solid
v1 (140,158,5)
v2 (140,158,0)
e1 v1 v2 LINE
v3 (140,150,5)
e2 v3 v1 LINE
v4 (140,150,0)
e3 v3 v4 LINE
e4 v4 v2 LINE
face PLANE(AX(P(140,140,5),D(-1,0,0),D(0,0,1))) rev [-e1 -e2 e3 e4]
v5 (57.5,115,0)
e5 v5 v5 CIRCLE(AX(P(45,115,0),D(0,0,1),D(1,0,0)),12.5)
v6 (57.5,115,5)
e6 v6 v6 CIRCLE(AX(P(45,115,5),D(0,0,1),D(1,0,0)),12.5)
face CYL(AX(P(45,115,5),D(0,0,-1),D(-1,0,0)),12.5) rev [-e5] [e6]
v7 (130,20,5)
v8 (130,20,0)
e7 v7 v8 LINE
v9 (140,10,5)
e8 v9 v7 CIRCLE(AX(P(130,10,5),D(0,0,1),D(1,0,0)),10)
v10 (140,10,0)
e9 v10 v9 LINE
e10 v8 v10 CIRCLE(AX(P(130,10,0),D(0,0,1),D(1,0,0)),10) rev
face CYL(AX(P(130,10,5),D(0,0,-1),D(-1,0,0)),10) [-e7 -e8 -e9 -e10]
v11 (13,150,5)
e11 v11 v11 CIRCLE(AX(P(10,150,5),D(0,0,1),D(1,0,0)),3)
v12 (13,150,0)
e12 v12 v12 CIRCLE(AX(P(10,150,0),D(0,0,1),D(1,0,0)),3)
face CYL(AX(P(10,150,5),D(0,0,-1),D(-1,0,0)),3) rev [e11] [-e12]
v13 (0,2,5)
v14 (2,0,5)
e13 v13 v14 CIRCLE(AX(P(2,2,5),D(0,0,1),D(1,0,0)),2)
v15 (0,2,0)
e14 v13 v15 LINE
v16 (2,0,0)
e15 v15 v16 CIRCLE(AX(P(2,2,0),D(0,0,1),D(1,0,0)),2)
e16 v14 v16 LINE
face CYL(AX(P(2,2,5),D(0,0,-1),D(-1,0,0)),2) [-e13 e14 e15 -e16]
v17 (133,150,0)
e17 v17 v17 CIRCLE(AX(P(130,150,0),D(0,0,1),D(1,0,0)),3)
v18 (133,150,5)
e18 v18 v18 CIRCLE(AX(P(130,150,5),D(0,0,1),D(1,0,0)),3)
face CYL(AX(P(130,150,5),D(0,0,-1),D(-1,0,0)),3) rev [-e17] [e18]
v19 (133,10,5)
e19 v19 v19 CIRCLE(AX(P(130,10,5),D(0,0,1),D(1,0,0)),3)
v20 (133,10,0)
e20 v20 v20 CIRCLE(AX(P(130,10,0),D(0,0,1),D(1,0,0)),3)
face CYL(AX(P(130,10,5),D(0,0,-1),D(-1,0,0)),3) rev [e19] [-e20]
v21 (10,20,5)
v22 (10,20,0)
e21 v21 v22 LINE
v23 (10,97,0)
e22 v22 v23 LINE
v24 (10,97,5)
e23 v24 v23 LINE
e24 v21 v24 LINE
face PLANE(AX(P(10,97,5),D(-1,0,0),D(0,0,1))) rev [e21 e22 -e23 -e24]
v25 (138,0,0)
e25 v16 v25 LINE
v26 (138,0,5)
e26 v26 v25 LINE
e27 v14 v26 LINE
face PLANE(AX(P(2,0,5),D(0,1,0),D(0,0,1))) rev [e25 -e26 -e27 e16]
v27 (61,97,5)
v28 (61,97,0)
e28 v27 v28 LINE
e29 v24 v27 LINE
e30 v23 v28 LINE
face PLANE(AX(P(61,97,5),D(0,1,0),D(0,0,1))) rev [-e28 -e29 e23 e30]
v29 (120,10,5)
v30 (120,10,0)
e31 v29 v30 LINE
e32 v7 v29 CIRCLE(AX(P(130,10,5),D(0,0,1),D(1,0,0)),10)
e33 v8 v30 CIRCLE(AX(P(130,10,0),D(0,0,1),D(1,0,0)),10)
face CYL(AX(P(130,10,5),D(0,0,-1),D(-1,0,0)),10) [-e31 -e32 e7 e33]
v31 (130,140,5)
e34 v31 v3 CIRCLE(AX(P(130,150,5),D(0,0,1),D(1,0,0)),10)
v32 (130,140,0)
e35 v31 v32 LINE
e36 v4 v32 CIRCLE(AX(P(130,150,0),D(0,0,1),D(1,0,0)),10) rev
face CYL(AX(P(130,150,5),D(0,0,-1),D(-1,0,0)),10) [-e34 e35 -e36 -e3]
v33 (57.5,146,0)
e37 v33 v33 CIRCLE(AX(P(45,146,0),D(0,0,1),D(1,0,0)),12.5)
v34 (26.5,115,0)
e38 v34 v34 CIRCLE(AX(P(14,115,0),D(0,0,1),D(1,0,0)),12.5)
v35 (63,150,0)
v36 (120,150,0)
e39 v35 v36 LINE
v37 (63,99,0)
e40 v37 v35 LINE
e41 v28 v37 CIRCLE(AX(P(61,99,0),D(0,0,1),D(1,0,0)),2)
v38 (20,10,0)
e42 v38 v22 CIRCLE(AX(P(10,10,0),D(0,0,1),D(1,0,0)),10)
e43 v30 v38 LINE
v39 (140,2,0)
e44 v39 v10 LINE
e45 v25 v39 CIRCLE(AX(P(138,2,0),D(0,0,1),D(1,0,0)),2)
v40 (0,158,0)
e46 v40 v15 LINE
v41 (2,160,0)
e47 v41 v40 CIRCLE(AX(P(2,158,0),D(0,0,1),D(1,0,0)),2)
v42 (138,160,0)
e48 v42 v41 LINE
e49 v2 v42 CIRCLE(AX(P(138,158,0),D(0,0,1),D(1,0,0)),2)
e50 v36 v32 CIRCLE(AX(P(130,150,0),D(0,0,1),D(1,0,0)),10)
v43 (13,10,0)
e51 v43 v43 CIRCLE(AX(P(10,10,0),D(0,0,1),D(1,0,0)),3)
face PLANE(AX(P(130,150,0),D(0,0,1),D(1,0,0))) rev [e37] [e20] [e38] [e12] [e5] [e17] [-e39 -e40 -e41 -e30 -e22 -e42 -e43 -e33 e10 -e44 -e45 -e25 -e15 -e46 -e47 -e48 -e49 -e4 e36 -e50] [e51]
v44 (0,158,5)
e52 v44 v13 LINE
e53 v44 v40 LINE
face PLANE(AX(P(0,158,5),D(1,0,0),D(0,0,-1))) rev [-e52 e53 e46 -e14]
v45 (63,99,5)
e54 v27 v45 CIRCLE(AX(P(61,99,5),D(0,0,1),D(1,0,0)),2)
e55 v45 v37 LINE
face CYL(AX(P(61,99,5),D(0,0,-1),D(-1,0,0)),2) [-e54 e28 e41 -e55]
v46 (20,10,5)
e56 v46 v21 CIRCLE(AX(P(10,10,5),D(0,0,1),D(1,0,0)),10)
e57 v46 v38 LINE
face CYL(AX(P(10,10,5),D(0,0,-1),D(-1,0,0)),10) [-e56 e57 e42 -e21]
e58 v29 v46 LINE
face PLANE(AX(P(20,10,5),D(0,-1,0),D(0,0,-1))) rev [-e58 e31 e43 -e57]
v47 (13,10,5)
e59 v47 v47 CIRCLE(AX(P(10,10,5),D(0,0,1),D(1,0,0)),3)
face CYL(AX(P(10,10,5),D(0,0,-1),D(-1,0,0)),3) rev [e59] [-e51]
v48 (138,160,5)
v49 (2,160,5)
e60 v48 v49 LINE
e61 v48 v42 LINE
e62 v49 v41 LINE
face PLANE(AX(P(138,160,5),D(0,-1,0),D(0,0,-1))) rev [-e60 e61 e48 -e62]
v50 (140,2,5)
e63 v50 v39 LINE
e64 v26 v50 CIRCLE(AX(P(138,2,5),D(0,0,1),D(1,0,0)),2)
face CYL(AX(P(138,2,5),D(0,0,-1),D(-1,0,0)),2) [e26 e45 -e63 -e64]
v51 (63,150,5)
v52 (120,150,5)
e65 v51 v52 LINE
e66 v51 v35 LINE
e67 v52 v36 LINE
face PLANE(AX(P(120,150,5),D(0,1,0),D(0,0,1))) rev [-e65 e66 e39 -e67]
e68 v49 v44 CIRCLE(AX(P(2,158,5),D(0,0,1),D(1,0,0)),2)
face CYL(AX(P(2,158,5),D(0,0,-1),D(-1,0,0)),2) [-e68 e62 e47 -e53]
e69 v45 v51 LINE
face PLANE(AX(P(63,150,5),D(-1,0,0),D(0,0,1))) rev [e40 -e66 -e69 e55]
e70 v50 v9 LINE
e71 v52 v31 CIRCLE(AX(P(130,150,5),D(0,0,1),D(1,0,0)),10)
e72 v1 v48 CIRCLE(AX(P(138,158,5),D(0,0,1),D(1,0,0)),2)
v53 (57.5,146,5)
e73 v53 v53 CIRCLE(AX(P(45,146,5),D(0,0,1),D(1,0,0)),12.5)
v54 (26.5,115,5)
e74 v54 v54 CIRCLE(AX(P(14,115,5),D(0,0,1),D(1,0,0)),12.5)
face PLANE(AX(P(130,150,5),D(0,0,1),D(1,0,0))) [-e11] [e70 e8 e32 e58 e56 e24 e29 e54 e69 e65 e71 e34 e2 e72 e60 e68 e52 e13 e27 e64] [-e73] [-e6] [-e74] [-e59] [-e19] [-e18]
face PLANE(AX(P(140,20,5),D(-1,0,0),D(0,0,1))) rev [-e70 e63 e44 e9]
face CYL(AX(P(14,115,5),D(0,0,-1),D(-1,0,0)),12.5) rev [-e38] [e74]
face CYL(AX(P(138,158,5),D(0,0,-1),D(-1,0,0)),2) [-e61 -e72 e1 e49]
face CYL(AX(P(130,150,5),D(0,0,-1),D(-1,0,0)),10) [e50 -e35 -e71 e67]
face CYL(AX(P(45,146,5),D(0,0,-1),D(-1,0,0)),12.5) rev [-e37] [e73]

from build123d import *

# Parameters (mm, degrees)
MODEL_R             = 12.5
MODEL_R_2           = 3
BOSS_EXTRUDE2_DEPTH = 5
FILLET1_R           = 10
FILLET2_R           = 10


with BuildPart() as part:
    # Model → Boss-Extrude2 (new body)
    with BuildSketch(Plane.XY):
        with BuildLine():
            Line((140, 140), (140, 158))
            ThreePointArc((140, 158), (139.414213562, 159.414213562), (138, 160))
            Line((138, 160), (2, 160))
            ThreePointArc((2, 160), (0.585786438, 159.414213562), (0, 158))
            Line((0, 158), (0, 2))
            ThreePointArc((0, 2), (0.585786438, 0.585786438), (2, 0))
            Line((2, 0), (138, 0))
            ThreePointArc((138, 0), (139.414213562, 0.585786438), (140, 2))
            Line((140, 2), (140, 20))
            Line((140, 20), (130, 20))
            ThreePointArc((130, 20), (122.928932188, 17.071067812), (120, 10))
            Line((120, 10), (20, 10))
            ThreePointArc((20, 10), (17.071067812, 17.071067812), (10, 20))
            Line((10, 20), (10, 97))
            Line((10, 97), (61, 97))
            ThreePointArc((61, 97), (62.414213562, 97.585786438), (63, 99))
            Line((63, 99), (63, 150))
            Line((63, 150), (120, 150))
            ThreePointArc((120, 150), (122.928932188, 142.928932188), (130, 140))
            Line((130, 140), (140, 140))
        make_face()
        with Locations((14, 115)):
            Circle(MODEL_R, mode=Mode.SUBTRACT)
        with Locations((45, 115)):
            Circle(MODEL_R, mode=Mode.SUBTRACT)
        with Locations((45, 146)):
            Circle(MODEL_R, mode=Mode.SUBTRACT)
        with Locations((10, 10)):
            Circle(MODEL_R_2, mode=Mode.SUBTRACT)
        with Locations((130, 10)):
            Circle(MODEL_R_2, mode=Mode.SUBTRACT)
        with Locations((130, 150)):
            Circle(MODEL_R_2, mode=Mode.SUBTRACT)
        with Locations((10, 150)):
            Circle(MODEL_R_2, mode=Mode.SUBTRACT)
    extrude(amount=BOSS_EXTRUDE2_DEPTH)

    # Fillet1
    fillet1_edges = [part.edges().sort_by_distance(p)[0] for p in [
        (140, 20, 2.5),
    ]]
    fillet(fillet1_edges, radius=FILLET1_R - 0.0001)  # a hair under: the kernel refuses the full size

    # Fillet2
    fillet2_edges = [part.edges().sort_by_distance(p)[0] for p in [
        (140, 140, 2.5),
    ]]
    fillet(fillet2_edges, radius=FILLET2_R - 0.0001)  # a hair under: the kernel refuses the full size


solid = part.part
